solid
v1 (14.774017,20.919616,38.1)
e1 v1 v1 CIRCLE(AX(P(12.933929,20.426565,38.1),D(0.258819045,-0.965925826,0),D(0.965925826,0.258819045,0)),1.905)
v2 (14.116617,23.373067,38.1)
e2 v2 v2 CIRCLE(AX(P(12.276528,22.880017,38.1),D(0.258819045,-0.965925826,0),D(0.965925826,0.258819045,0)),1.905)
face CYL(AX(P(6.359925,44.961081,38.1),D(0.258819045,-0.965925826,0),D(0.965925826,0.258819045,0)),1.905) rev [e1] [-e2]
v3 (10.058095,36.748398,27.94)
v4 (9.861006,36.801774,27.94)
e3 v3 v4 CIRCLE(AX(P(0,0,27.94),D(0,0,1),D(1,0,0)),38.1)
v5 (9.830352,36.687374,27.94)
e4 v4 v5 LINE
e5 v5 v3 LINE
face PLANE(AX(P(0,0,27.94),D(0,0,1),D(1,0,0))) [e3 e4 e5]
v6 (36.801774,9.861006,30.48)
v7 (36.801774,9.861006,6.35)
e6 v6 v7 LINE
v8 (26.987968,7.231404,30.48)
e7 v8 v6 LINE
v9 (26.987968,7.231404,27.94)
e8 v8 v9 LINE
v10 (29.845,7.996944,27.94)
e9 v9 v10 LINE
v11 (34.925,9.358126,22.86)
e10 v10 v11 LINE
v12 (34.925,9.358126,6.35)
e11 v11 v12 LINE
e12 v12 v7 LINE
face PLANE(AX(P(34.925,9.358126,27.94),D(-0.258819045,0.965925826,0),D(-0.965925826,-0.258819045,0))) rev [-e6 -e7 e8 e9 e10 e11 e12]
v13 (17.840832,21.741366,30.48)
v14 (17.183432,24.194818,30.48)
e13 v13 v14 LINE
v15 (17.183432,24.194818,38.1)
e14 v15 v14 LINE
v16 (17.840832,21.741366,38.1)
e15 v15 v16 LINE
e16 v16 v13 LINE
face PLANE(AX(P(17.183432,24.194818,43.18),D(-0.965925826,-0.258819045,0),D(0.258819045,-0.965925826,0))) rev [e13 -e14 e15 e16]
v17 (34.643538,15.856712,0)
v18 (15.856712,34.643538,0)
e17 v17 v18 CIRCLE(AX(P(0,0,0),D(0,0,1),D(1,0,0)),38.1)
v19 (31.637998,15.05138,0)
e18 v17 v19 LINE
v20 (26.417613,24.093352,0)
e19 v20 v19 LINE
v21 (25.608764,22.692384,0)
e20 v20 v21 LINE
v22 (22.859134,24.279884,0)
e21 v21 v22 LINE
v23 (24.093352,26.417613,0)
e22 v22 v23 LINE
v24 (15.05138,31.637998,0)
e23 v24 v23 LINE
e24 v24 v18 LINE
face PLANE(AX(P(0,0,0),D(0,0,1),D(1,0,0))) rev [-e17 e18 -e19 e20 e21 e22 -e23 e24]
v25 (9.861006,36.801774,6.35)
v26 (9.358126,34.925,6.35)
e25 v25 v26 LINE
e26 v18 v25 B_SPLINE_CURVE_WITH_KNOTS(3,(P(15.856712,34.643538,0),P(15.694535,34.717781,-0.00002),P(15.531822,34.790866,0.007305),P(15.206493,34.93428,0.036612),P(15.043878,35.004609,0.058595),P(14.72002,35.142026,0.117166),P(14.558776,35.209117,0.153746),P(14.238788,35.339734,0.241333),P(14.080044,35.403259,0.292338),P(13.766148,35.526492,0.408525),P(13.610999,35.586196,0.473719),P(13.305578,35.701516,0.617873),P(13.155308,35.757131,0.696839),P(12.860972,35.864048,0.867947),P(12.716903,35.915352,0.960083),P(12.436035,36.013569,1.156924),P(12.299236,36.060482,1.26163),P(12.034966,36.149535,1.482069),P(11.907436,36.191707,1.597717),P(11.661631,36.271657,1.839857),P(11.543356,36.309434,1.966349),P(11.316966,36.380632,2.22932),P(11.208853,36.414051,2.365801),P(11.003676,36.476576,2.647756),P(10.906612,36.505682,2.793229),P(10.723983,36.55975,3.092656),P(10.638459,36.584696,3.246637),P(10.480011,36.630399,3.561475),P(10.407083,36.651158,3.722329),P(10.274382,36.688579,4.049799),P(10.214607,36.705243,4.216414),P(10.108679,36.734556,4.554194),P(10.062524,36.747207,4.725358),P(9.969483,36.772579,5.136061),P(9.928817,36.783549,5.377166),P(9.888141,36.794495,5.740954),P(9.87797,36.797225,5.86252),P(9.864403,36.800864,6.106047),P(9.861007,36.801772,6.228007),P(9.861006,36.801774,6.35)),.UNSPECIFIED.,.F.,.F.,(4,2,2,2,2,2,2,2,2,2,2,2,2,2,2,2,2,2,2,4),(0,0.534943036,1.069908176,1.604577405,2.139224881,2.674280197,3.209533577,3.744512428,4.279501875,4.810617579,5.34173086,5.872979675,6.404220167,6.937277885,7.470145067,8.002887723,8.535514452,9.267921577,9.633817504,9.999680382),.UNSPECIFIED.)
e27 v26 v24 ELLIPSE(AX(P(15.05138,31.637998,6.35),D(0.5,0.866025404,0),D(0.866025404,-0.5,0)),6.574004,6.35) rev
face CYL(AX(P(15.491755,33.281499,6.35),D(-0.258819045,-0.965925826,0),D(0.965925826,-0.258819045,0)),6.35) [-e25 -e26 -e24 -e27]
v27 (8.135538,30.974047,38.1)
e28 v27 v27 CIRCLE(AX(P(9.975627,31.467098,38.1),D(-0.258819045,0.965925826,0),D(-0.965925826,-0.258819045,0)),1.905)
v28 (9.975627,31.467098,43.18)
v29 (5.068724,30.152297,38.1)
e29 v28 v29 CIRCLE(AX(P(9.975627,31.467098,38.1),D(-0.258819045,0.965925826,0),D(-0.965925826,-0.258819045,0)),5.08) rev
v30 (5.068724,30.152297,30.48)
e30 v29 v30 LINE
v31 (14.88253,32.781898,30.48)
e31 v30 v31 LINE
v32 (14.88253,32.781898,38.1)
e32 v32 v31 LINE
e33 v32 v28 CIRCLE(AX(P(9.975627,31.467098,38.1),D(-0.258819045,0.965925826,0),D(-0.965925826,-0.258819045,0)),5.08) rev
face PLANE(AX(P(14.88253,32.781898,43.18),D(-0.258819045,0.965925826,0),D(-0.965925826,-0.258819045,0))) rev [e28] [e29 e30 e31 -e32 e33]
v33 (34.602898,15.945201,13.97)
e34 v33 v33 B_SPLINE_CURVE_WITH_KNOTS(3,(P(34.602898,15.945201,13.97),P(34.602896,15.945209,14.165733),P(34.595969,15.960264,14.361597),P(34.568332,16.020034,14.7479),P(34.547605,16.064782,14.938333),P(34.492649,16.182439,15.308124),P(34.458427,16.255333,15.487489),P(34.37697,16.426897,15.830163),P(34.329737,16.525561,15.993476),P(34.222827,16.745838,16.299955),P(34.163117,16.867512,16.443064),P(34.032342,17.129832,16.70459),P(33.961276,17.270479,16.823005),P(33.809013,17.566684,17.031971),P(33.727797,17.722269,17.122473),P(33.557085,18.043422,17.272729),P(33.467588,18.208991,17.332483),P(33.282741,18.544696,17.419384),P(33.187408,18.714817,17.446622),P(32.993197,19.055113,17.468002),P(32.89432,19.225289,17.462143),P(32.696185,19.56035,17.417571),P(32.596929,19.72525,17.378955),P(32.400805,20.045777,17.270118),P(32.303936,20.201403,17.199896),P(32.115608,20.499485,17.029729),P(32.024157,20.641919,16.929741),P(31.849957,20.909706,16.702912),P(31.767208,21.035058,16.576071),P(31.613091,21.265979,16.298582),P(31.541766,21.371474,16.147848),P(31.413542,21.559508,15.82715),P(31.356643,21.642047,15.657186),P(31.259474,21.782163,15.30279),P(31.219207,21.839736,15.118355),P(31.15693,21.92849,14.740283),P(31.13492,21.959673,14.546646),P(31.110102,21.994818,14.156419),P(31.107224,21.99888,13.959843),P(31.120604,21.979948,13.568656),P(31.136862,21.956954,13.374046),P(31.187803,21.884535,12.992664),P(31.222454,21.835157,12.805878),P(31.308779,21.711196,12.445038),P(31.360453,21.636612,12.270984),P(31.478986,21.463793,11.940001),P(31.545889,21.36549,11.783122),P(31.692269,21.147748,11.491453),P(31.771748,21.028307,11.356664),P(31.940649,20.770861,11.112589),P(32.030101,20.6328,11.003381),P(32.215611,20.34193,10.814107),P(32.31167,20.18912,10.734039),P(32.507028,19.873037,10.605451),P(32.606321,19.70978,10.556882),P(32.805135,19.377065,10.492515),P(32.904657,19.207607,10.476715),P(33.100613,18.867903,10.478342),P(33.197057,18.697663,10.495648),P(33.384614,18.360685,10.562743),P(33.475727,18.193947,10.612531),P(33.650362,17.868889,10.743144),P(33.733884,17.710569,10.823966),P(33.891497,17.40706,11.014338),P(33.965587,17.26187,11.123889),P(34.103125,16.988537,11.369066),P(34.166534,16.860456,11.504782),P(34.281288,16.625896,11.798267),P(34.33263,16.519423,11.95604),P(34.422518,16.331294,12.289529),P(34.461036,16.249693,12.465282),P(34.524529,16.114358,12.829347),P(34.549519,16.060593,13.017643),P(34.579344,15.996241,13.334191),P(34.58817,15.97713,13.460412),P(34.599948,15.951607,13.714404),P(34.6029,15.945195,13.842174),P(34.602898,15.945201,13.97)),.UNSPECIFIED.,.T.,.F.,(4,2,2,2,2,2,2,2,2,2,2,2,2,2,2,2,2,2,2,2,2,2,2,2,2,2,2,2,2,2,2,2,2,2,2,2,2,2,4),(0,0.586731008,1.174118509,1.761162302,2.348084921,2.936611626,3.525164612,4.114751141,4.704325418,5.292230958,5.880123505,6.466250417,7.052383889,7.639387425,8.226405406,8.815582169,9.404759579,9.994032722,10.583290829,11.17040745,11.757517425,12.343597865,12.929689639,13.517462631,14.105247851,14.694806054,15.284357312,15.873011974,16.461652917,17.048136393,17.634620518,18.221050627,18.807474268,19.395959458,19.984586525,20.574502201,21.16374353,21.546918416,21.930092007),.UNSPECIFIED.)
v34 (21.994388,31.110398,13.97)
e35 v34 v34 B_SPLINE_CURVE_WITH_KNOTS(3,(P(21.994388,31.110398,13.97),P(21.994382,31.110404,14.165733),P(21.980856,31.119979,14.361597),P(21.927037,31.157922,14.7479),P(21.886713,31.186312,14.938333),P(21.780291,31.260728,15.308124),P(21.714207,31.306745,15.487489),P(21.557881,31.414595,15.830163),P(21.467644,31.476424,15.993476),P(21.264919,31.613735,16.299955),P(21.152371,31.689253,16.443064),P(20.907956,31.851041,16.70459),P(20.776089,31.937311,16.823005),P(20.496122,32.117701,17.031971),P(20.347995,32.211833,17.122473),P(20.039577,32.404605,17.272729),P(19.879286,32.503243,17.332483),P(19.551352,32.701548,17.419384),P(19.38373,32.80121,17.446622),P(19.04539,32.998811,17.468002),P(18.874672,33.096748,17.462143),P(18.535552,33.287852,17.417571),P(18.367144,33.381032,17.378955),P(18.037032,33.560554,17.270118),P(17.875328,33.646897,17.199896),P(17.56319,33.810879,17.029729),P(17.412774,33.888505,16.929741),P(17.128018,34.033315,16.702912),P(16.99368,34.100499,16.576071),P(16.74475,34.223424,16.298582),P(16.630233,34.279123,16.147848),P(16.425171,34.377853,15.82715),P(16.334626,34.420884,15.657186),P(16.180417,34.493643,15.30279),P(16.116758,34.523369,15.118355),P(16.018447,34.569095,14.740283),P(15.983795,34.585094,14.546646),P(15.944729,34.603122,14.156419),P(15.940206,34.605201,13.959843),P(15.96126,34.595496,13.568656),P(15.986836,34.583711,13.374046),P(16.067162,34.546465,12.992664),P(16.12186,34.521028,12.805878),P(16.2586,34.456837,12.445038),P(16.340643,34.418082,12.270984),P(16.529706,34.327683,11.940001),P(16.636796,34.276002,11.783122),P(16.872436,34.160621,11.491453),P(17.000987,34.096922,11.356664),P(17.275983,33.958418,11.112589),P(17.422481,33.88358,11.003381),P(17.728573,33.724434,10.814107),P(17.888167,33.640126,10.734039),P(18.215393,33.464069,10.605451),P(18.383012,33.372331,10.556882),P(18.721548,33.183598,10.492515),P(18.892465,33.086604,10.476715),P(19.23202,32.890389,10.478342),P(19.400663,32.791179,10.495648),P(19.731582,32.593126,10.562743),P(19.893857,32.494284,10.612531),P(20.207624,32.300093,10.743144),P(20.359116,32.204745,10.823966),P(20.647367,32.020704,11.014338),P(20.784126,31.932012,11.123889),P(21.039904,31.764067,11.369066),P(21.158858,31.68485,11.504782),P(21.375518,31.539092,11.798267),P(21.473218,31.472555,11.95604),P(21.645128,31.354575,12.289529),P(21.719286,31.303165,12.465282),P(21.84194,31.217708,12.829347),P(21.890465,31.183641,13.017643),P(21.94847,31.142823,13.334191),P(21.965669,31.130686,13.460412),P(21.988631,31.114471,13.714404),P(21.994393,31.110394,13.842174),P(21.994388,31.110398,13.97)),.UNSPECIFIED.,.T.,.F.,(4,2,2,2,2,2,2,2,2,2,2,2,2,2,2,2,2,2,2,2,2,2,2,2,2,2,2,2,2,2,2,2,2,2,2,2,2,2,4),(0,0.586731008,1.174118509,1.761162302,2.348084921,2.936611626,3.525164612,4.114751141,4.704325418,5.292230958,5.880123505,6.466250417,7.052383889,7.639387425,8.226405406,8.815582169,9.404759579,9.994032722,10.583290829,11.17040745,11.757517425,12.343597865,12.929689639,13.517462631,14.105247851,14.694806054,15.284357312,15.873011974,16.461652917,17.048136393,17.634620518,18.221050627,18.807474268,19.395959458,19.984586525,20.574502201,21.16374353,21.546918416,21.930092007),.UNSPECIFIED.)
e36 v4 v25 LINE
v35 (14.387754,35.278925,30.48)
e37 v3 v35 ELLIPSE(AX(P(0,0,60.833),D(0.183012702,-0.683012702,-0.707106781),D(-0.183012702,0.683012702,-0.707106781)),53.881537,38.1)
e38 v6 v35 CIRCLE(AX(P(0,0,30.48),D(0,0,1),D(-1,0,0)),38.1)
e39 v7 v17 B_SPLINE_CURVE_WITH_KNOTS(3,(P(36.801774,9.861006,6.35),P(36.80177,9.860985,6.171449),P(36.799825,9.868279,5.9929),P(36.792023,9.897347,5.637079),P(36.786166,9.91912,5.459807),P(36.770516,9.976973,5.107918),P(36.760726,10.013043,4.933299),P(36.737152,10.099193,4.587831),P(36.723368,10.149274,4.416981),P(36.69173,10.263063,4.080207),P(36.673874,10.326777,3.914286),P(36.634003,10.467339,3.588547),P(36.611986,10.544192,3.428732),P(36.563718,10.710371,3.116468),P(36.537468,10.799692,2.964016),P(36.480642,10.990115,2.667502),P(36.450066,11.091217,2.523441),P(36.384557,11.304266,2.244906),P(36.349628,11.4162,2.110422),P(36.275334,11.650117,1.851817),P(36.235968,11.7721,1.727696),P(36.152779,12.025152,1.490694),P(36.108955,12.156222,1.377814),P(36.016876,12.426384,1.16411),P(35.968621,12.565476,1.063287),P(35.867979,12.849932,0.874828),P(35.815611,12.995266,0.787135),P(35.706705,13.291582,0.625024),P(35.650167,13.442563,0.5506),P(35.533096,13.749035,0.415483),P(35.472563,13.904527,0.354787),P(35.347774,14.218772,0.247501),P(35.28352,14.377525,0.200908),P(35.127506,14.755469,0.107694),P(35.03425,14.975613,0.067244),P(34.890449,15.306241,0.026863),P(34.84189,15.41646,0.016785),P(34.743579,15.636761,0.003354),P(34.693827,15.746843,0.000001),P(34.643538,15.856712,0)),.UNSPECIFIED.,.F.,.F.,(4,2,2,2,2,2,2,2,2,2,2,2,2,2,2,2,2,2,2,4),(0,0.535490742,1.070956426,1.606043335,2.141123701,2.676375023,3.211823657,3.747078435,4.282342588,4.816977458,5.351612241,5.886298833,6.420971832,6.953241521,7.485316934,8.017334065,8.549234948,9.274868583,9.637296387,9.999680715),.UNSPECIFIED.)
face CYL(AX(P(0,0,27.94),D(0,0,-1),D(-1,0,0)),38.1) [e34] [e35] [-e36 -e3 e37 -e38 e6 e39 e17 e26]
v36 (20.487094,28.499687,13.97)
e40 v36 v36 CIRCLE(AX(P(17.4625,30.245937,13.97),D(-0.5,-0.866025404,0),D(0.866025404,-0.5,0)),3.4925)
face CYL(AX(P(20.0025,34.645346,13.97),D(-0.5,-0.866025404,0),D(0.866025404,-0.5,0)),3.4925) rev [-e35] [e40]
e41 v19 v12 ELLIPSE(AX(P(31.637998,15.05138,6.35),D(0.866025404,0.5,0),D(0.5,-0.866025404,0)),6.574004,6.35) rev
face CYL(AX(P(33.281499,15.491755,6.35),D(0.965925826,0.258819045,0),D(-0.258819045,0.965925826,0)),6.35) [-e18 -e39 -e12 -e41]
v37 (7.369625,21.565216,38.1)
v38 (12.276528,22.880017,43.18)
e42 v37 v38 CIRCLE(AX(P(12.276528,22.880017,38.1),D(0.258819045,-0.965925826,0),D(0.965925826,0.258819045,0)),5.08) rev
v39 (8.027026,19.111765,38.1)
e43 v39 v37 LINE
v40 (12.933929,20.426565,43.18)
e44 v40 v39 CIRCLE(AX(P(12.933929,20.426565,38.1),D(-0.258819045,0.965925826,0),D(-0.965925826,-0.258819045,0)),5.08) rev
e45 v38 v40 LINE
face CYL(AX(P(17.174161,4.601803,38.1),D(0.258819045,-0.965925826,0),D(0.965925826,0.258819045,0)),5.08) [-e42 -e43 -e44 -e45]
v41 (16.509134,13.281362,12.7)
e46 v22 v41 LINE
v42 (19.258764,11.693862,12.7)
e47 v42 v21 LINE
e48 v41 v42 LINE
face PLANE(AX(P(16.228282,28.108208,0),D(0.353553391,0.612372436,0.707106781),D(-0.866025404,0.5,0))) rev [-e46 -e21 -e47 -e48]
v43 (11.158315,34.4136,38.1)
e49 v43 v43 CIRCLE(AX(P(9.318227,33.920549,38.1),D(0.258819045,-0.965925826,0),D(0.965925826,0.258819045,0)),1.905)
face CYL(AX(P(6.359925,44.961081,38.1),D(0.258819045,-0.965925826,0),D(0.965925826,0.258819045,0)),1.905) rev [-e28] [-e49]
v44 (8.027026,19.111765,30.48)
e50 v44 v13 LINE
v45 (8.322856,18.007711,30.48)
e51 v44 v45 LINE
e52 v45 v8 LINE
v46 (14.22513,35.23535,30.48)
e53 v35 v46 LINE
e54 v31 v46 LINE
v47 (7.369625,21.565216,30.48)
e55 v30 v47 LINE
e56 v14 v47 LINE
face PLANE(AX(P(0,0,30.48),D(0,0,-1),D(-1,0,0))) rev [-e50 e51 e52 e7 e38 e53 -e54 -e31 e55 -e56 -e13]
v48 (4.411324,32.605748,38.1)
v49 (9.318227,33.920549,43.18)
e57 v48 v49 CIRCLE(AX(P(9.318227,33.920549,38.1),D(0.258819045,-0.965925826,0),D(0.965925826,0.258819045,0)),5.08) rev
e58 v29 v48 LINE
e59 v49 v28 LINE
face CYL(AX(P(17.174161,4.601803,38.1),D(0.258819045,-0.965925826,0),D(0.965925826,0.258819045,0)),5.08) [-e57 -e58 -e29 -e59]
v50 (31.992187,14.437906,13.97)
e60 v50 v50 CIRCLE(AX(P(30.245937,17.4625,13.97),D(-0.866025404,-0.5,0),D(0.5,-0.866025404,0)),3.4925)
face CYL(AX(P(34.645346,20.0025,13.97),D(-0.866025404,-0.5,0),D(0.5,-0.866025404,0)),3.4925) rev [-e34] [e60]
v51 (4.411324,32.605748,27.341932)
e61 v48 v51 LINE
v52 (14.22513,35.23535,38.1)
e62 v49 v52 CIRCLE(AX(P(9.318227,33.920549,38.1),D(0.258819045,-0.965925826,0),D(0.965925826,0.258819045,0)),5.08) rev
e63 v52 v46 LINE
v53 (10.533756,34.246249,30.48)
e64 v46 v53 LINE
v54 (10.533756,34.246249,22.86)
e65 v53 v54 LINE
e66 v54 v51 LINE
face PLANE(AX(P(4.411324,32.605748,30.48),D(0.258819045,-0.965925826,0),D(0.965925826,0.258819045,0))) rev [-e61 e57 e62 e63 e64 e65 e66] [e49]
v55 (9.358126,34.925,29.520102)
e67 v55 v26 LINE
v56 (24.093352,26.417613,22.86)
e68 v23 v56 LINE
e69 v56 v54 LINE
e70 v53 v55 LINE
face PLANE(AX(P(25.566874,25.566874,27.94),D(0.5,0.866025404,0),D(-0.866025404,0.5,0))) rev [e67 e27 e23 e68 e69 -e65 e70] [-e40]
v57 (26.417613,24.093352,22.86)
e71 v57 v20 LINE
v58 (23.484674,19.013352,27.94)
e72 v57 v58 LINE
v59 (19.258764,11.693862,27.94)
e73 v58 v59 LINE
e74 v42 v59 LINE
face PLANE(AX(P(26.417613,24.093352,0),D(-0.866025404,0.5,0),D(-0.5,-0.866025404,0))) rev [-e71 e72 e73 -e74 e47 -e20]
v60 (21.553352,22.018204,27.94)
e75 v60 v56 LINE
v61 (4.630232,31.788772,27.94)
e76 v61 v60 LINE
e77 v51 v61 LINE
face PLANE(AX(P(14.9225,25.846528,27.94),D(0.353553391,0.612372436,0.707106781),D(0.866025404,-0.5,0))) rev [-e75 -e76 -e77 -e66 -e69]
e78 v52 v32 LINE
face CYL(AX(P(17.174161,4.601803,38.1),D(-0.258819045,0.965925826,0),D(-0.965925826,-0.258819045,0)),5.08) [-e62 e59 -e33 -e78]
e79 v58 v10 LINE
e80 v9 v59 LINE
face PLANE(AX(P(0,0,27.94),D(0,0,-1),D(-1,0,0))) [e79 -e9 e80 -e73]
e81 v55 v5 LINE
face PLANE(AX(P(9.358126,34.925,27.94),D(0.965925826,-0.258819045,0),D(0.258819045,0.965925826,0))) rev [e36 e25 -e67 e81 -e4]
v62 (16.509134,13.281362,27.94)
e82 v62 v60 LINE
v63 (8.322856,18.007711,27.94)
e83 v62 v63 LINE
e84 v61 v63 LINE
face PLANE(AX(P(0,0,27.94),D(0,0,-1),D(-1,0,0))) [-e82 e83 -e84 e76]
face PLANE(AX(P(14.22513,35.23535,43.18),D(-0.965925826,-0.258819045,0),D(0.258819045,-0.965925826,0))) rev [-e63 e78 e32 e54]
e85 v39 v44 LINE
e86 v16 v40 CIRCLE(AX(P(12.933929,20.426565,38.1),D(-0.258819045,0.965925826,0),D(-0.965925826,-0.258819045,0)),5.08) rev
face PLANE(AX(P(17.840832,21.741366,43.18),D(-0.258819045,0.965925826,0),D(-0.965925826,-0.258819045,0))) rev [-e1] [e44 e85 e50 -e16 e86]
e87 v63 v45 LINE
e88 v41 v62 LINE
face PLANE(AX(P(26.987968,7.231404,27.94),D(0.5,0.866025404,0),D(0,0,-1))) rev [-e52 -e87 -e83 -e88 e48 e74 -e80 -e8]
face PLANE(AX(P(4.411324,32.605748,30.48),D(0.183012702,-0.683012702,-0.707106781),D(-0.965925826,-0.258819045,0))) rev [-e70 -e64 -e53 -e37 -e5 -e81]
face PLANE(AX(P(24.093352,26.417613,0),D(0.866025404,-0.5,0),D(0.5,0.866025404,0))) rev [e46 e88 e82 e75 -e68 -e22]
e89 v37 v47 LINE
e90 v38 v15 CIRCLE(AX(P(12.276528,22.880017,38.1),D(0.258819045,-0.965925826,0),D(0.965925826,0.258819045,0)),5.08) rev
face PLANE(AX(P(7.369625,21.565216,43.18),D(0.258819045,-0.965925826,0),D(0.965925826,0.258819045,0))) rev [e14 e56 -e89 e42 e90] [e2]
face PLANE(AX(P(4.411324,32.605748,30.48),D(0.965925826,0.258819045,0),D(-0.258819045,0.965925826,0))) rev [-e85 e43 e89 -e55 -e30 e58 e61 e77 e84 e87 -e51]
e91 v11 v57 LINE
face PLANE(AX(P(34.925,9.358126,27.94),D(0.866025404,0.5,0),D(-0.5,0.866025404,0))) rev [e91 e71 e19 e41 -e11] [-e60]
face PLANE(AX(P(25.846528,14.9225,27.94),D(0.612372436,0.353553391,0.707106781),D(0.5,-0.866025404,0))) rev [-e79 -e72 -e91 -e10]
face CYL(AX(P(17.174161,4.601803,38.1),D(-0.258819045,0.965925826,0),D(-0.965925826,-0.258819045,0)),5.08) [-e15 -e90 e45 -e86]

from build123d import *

# Parameters (mm, degrees)
BOSS_EXTRUDE1_DEPTH = 27.94
SKETCH3_R           = 3.4925
CUT_EXTRUDE1_DEPTH  = 5.08
CIRPATTERN1_COUNT   = 2
CIRPATTERN1_ANGLE   = 30
FILLET2_R           = 6.35
BOSS_EXTRUDE2_DEPTH = 2.54
BOSS_EXTRUDE3_DEPTH = 12.7
FILLET3_R           = 5.08
SKETCH10_R          = 1.905
CUT_EXTRUDE2_DEPTH  = 25.4
CHAMFER2_SIZE       = 2.54
CHAMFER3_SIZE       = 15.24
BOSS_EXTRUDE4_DEPTH = 27.94
CHAMFER4_SIZE       = 12.7
CHAMFER5_SIZE       = 5.08


# Some blends are built 0.0001 mm under size
with BuildPart() as part:
    # Sketch1 → Boss-Extrude1 (new body)
    with BuildSketch(Plane.XY):
        with BuildLine():
            Line((9.358125546, 34.925), (9.861005618, 36.801773982))
            ThreePointArc((9.861005618, 36.801773982), (26.940768363, 26.940768363), (36.801773982, 9.861005618))
            Line((36.801773982, 9.861005618), (34.925, 9.358125546))
            Line((34.925, 9.358125546), (25.566874454, 25.566874454))
            Line((25.566874454, 25.566874454), (9.358125546, 34.925))
        make_face()
    extrude(amount=BOSS_EXTRUDE1_DEPTH)

    # Sketch3 → Cut-Extrude1 (cut)
    with BuildSketch(Plane(origin=(17.4625, 30.245937227, 0), x_dir=(-0.8660254037844386, 0.4999999999999999, 0), z_dir=(-0.49999999999999994, -0.8660254037844387, 0))):
        with Locations(Location((0, -13.97, 0), (0, 0, 180))):
            Circle(SKETCH3_R)
    cut_extrude1 = extrude(amount=-CUT_EXTRUDE1_DEPTH, mode=Mode.SUBTRACT)

    # CirPattern1: Cut-Extrude1 ×2 about axis
    cirpattern1_axis = Axis((0, 0, 27.94), (0, 0, -1))
    for i in range(1, CIRPATTERN1_COUNT):
        add(cut_extrude1.rotate(cirpattern1_axis, i * CIRPATTERN1_ANGLE / (CIRPATTERN1_COUNT - 1)), mode=Mode.SUBTRACT)

    # Fillet2
    fillet2_edges = [part.edges().sort_by_distance(p)[0] for p in [
        (9.609565582, 35.863386991, 0),
        (35.863386991, 9.609565582, 0),
        (25.566874454, 25.566874454, 13.97),
    ]]
    fillet(fillet2_edges, radius=FILLET2_R)

    # Sketch7 → Boss-Extrude2 (add)
    with BuildSketch(Plane.XY.offset(27.94)):
        with BuildLine():
            Line((12.267257994, 3.287001873), (36.801773982, 9.861005618))
            ThreePointArc((36.801773982, 9.861005618), (28.576381723, 25.199214424), (14.387753745, 35.278924901))
            Line((14.387753745, 35.278924901), (4.411323518, 32.605748478))
            Line((4.411323518, 32.605748478), (12.267257994, 3.287001873))
        make_face()
    extrude(amount=BOSS_EXTRUDE2_DEPTH)

    # Sketch8 → Boss-Extrude3 (add)
    with BuildSketch(Plane.XY.offset(30.48)):
        Polygon((4.411323518, 32.605748478), (14.225129913, 35.235349976), (14.882530288, 32.781898378), (5.068723892, 30.152296879), align=None)
        Polygon((7.369625203, 21.565216284), (17.183431598, 24.194817782), (17.840831973, 21.741366183), (8.027025578, 19.111764685), align=None)
    extrude(amount=BOSS_EXTRUDE3_DEPTH)

    # Fillet3
    fillet3_edges = [part.edges().sort_by_distance(p)[0] for p in [
        (14.5538301, 34.008624177, 43.18),
        (17.512131786, 22.968091983, 43.18),
        (7.698325391, 20.338490484, 43.18),
        (4.740023705, 31.379022679, 43.18),
    ]]
    fillet(fillet3_edges, radius=FILLET3_R - 0.0001)  # a hair under: the kernel refuses the full size

    # Sketch10 → Cut-Extrude2 (cut)
    with BuildSketch(Plane(origin=(-4.240232416, 15.824762812, 0), x_dir=(0.9659258262890666, 0.2588190451025272, 0), z_dir=(0.2588190451025272, -0.9659258262890666, 0))):
        with Locations((17.78, 38.1)):
            Circle(SKETCH10_R)
    extrude(amount=-CUT_EXTRUDE2_DEPTH, mode=Mode.SUBTRACT)

    # Chamfer2
    # the kernel refuses this chamfer: 2.54 mm, written as the material it adds along each edge
    with BuildSketch(Plane(origin=(20.697253484, 36.96955026, 27.94), x_dir=(0.00711645652860803, -0.026558977334619874, 0.9996219169112968), z_dir=(-0.9659258262890671, -0.25881904510252557, 0))) as chamfer2_piece_1_section:
        Polygon((CHAMFER2_SIZE * 0.999621916911, CHAMFER2_SIZE * 0.0274958766106), (-CHAMFER2_SIZE * 0.0274958766106, CHAMFER2_SIZE * 0.999621916911), (0, 0), align=None)
    chamfer2_piece_1 = extrude(amount=17.054101493, mode=Mode.PRIVATE)
    chamfer2_piece_1 = chamfer2_piece_1 & Plane(origin=(0, 0, 29.188992539), x_dir=(0.25881904510252113, 0.9659258262890682, 0), z_dir=(0, 0, -1)) * Cylinder(38.1, 45, mode=Mode.PRIVATE)
    chamfer2_piece_1 = split(chamfer2_piece_1, bisect_by=Plane(origin=(9.778458112, 36.493702493, 29.188992539), z_dir=(0.9659258262890693, -0.25881904510251724, 0)), keep=Keep.TOP, mode=Mode.PRIVATE)
    chamfer2_piece_1 = split(chamfer2_piece_1, bisect_by=Plane(origin=(12.882809536, 32.89002275, 29.188992539), z_dir=(0.4999999999999998, 0.8660254037844388, 0)), keep=Keep.TOP, mode=Mode.PRIVATE)
    add(chamfer2_piece_1)

    # Chamfer3
    chamfer3_edges = [part.edges().sort_by_distance(p)[0] for p in [
        (12.267257994, 3.287001873, 29.21),
    ]]
    chamfer(chamfer3_edges, length=CHAMFER3_SIZE)

    # Sketch11 → Boss-Extrude4 (add)
    with BuildSketch(Plane(origin=(0, 0, 27.94), x_dir=(-1, 0, 0), z_dir=(0, 0, -1))):
        with BuildLine():
            Line((-26.41761314, 24.093351826), (-19.258764216, 11.693861766))
            Line((-19.258764216, 11.693861766), (-16.509133559, 13.281361766))
            Line((-16.509133559, 13.281361766), (-24.093351826, 26.41761314))
            ThreePointArc((-24.093351826, 26.41761314), (-25.408479887, 25.408479887), (-26.41761314, 24.093351826))
        make_face()
    extrude(amount=BOSS_EXTRUDE4_DEPTH)

    # Chamfer4
    chamfer4_edges = [part.edges().sort_by_distance(p)[0] for p in [
        (17.883948888, 12.487611766, 0),
    ]]
    chamfer(chamfer4_edges, length=CHAMFER4_SIZE)

    # Chamfer5
    # the kernel refuses this chamfer: 5.08 mm, written as the material it adds along each edge
    with BuildSketch(Plane(origin=(35.40723724, 19.885538351, 27.94), x_dir=(-0.49981095845564816, -0.8656979742248805, 0.027495876610586608), z_dir=(-0.8660254037844388, 0.4999999999999998, 0))) as chamfer5_piece_1_section:
        Polygon((CHAMFER5_SIZE * 0.999621916911, -CHAMFER5_SIZE * 0.0274958766106), (-CHAMFER5_SIZE * 0.0274958766106, -CHAMFER5_SIZE * 0.999621916911), (0, 0), align=None)
    chamfer5_piece_1 = extrude(amount=41.78557159, mode=Mode.PRIVATE)
    chamfer5_piece_1 = split(chamfer5_piece_1, bisect_by=Plane(origin=(8.735724363, 16.466864811, 26.882684671), z_dir=(0.9659258262890666, 0.25881904510252707, 0)), keep=Keep.TOP, mode=Mode.PRIVATE)
    chamfer5_piece_1 = split(chamfer5_piece_1, bisect_by=Plane(origin=(27.739257301, 21.804196991, 26.882684671), z_dir=(-0.8660254037844388, -0.4999999999999997, 0)), keep=Keep.TOP, mode=Mode.PRIVATE)
    chamfer5_piece_1 = split(chamfer5_piece_1, bisect_by=Plane(origin=(22.621869959, 37.485249691, 26.882684671), z_dir=(0.25881904510252557, -0.9659258262890671, 0)), keep=Keep.TOP, mode=Mode.PRIVATE)
    add(chamfer5_piece_1)
    with BuildSketch(Plane(origin=(41.457074789, -1.955759868, 27.94), x_dir=(-0.8656979742248805, -0.49981095845564805, 0.027495876610586608), z_dir=(-0.4999999999999997, 0.8660254037844388, 0))) as chamfer5_piece_2_section:
        Polygon((CHAMFER5_SIZE * 0.999621916911, -CHAMFER5_SIZE * 0.0274958766106), (-CHAMFER5_SIZE * 0.0274958766106, -CHAMFER5_SIZE * 0.999621916911), (0, 0), align=None)
    chamfer5_piece_2 = extrude(amount=43.143072877, mode=Mode.PRIVATE)
    chamfer5_piece_2 = split(chamfer5_piece_2, bisect_by=Plane(origin=(31.353292894, 8.401089511, 26.207782455), z_dir=(-0.2588190451025267, 0.9659258262890668, 0)), keep=Keep.TOP, mode=Mode.PRIVATE)
    chamfer5_piece_2 = split(chamfer5_piece_2, bisect_by=Plane(origin=(32.711409072, 21.441975469, 26.207782455), z_dir=(-0.50000000000019, -0.866025403784329, 0)), keep=Keep.TOP, mode=Mode.PRIVATE)
    add(chamfer5_piece_2)


solid = part.part
